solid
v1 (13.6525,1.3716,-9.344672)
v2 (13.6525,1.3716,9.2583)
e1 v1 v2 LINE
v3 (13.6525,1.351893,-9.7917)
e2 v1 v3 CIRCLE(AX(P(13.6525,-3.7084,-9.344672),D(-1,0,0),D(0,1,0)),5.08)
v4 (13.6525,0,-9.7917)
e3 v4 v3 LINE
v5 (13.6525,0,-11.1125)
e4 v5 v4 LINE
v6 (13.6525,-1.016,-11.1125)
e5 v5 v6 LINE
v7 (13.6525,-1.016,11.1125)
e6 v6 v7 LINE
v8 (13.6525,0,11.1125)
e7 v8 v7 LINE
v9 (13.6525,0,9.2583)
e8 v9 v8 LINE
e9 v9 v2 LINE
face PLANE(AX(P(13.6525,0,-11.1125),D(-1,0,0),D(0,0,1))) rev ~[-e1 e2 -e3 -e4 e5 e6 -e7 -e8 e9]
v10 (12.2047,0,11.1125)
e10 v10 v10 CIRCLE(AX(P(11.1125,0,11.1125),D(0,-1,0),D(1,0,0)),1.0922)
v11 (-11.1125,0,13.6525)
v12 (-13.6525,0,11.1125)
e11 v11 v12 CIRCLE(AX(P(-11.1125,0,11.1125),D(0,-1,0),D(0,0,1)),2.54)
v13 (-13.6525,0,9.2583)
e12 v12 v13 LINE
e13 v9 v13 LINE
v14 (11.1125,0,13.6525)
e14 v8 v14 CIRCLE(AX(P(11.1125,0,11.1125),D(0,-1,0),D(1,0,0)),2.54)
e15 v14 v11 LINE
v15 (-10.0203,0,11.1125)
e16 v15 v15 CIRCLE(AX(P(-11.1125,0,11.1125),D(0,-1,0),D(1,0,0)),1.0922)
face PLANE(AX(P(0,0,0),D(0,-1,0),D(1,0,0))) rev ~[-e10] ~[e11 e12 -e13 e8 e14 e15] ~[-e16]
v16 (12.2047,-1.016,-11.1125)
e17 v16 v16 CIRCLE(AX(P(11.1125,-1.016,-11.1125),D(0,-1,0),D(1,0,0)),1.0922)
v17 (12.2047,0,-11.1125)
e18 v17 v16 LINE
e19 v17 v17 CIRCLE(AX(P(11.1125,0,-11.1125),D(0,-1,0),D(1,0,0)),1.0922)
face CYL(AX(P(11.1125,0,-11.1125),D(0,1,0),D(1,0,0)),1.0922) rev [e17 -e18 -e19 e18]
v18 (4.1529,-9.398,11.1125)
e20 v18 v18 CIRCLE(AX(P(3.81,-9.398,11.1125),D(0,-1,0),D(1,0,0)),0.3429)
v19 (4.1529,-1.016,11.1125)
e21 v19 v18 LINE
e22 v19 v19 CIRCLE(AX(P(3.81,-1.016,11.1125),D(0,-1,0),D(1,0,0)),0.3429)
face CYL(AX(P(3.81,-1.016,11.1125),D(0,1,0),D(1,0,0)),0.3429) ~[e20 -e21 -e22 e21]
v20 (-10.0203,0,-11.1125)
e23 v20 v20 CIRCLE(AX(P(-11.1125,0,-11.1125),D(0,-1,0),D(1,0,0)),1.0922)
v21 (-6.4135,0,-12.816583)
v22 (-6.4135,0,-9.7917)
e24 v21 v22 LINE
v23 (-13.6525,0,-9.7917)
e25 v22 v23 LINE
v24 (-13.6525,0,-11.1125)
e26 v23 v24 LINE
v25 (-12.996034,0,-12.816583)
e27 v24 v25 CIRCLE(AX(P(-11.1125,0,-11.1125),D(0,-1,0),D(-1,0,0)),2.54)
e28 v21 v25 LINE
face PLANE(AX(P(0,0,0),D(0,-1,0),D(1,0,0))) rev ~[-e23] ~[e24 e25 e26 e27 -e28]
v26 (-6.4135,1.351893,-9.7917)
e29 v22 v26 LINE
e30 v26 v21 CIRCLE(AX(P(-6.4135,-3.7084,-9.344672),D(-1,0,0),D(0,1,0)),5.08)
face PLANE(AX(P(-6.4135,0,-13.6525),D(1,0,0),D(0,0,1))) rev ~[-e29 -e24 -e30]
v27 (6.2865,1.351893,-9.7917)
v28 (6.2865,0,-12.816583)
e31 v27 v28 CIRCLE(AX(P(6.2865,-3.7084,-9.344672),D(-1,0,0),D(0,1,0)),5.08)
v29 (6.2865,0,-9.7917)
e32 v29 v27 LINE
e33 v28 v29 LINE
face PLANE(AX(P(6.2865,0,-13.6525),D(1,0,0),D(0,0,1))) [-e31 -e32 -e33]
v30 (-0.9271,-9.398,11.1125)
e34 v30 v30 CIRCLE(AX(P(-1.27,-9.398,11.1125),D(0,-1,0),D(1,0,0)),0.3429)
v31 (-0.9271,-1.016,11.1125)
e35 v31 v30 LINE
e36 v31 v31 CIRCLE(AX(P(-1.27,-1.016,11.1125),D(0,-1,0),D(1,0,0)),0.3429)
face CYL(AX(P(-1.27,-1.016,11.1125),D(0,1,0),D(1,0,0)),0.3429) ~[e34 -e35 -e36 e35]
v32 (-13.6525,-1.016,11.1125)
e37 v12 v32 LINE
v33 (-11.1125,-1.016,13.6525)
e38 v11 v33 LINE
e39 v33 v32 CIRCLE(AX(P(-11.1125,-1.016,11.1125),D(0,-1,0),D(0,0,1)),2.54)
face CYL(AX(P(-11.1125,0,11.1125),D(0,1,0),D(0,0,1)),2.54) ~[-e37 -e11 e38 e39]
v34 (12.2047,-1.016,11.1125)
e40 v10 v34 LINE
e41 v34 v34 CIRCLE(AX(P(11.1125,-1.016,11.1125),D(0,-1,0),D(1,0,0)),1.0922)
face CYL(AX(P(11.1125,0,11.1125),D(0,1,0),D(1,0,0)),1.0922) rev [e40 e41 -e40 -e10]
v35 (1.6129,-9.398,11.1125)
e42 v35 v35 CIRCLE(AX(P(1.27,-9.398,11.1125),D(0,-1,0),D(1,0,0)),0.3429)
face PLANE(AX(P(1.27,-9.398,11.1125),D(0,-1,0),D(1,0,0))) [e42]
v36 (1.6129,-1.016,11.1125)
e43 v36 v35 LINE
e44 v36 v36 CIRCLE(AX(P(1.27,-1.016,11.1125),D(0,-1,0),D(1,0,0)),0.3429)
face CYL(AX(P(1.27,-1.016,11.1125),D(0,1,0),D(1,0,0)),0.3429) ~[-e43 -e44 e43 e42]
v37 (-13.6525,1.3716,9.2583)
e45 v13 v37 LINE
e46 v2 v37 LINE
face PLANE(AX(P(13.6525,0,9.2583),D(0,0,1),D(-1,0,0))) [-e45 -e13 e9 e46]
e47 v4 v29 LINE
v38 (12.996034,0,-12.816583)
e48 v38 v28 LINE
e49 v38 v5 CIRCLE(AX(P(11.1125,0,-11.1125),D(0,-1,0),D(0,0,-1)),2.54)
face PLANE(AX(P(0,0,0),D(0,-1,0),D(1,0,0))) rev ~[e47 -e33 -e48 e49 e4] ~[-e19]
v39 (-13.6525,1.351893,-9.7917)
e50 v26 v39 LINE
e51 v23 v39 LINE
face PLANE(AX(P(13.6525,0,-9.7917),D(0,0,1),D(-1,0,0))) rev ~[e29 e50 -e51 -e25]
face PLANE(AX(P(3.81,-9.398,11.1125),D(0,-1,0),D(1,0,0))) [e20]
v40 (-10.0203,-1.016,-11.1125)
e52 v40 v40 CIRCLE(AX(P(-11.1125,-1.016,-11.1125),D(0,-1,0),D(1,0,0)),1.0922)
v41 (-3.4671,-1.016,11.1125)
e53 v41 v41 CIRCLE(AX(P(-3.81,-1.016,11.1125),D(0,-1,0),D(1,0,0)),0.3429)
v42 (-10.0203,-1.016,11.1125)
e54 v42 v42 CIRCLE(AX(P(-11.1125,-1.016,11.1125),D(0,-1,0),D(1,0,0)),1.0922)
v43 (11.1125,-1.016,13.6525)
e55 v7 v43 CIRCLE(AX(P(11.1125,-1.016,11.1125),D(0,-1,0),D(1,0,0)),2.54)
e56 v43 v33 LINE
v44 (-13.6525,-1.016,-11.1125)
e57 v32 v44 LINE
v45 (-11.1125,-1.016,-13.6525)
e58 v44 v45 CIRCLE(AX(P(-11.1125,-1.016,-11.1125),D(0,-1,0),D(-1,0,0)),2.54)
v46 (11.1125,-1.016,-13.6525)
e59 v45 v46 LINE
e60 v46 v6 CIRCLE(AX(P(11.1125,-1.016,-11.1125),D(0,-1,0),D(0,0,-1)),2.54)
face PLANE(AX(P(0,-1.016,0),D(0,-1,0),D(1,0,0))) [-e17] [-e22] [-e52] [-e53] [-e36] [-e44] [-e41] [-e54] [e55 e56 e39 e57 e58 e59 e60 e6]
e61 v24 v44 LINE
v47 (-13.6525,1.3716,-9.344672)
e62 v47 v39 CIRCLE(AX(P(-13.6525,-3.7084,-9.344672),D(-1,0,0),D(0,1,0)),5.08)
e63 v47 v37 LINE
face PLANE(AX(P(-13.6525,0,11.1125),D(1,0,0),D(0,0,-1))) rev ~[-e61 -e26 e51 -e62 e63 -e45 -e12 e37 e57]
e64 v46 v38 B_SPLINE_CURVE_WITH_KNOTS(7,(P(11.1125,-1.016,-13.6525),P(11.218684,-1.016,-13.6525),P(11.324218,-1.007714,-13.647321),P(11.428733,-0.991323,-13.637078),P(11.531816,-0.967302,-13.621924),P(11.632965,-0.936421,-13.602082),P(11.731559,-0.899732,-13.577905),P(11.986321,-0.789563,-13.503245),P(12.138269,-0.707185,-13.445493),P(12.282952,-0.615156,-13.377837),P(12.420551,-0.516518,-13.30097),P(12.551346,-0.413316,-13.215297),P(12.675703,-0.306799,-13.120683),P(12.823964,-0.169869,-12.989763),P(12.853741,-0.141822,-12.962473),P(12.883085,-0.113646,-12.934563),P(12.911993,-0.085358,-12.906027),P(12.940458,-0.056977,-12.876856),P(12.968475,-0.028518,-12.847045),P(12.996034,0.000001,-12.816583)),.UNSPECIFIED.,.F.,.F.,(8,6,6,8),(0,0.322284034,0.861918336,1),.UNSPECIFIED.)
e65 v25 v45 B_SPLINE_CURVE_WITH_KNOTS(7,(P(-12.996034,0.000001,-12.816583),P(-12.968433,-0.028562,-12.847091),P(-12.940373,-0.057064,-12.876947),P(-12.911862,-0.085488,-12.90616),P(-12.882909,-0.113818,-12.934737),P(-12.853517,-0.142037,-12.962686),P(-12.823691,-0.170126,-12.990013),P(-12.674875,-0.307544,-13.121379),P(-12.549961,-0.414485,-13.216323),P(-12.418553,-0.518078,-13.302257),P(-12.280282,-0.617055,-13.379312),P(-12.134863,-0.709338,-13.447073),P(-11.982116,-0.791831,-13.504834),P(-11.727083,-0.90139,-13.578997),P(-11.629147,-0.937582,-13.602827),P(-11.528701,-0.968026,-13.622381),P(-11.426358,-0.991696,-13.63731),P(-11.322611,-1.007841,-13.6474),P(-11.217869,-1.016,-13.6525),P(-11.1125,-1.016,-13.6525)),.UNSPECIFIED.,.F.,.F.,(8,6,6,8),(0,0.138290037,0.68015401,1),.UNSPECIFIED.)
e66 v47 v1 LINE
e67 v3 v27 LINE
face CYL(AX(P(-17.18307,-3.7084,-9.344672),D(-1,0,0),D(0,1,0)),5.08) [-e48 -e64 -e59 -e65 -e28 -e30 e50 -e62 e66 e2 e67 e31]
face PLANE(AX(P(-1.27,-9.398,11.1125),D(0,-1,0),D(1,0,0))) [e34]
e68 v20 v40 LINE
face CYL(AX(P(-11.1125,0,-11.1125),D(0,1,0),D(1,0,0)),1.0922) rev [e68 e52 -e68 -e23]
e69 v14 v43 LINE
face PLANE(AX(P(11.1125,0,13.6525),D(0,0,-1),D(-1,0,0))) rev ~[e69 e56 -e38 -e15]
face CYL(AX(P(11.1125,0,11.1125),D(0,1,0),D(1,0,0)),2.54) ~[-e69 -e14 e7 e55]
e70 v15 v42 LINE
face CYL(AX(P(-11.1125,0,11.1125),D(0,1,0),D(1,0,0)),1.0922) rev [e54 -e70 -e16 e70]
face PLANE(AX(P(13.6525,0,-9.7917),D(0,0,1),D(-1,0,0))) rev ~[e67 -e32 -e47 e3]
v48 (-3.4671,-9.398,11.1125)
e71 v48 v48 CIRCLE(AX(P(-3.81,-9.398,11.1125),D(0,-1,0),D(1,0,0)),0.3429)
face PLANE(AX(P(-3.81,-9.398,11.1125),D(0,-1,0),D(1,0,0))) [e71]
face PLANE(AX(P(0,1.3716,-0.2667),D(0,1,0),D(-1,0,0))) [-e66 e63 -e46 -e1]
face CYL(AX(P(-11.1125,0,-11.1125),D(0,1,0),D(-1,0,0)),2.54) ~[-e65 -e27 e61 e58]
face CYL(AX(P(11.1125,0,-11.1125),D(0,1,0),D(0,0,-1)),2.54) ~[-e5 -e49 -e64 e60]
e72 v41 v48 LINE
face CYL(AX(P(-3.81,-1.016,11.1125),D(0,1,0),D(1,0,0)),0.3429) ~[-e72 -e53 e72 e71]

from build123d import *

# Parameters (mm, degrees)
F0_R        = 1.0922
F1_DEPTH    = 1.016
F2_R        = 0.3429
F3_DEPTH    = 8.382
F4_W        = 27.305
F4_H        = 19.05
F5_DEPTH    = 1.3716
F6_W        = 12.7
F6_H        = 3.8608
F7_DEPTH    = 1.3716
F8_T1_DEPTH = 34.2391400943


# Not quite as in the source:
# - a fillet or chamfer that OpenCascade refuses, or shapes differently, is made with other operations: its cross-section is extruded or revolved along the edge and cut away or added


with BuildPart() as f1:
    # F0 (on Front) → F1 (new body)
    with BuildSketch(Plane.XZ):
        with BuildLine():
            Line((11.1125, 13.6525), (-11.1125, 13.6525))
            ThreePointArc((-11.1125, 13.6525), (-12.9085512242, 12.9085512242), (-13.6525, 11.1125))
            Line((-13.6525, 11.1125), (-13.6525, -11.1125))
            ThreePointArc((-13.6525, -11.1125), (-12.9085512242, -12.9085512242), (-11.1125, -13.6525))
            Line((-11.1125, -13.6525), (11.1125, -13.6525))
            ThreePointArc((11.1125, -13.6525), (12.9085512242, -12.9085512242), (13.6525, -11.1125))
            Line((13.6525, -11.1125), (13.6525, 11.1125))
            ThreePointArc((13.6525, 11.1125), (12.9085512242, 12.9085512242), (11.1125, 13.6525))
        make_face()
        with Locations((-11.1125, -11.1125)):
            Circle(F0_R, mode=Mode.SUBTRACT)
        with Locations((11.1125, -11.1125)):
            Circle(F0_R, mode=Mode.SUBTRACT)
        with Locations((-11.1125, 11.1125)):
            Circle(F0_R, mode=Mode.SUBTRACT)
        with Locations((11.1125, 11.1125)):
            Circle(F0_R, mode=Mode.SUBTRACT)
    extrude(amount=F1_DEPTH)

    # F2 (on face) → F3 (join)
    with BuildSketch(Plane.XZ.offset(1.016)):
        with Locations((-3.81, 11.1125)):
            Circle(F2_R)
        with Locations((-1.27, 11.1125)):
            Circle(F2_R)
        with Locations((3.81, 11.1125)):
            Circle(F2_R)
        with Locations((1.27, 11.1125)):
            Circle(F2_R)
    extrude(amount=F3_DEPTH)

    # F4 (on face) → F5 (join)
    with BuildSketch(Plane(origin=(0, 0, 0), x_dir=(-1, 0, 0), z_dir=(0, 1, 0))):
        with Locations((0, -0.2667)):
            Rectangle(F4_W, F4_H)
    extrude(amount=F5_DEPTH)

    # F6 (on face) → F7 (join, through all)
    with BuildSketch(Plane(origin=(0, 0, 0), x_dir=(-1, 0, 0), z_dir=(0, 1, 0))):
        with Locations((0.0635, -11.7221)):
            Rectangle(F6_W, F6_H)
    extrude(amount=F7_DEPTH)

    # F8: fillet of radius 5.08 on 1 edges, made by hand

    # F8_s2 → F8_t1 (cut)
    with BuildSketch(Plane.YZ.offset(-17.1830700471)):
        with BuildLine():
            ThreePointArc((1.3716, -9.3446719811), (0.7347853439, -11.8072933487), (-1.016, -13.6525))
            Line((-1.016, -13.6525), (1.3716, -13.6525))
            Line((1.3716, -13.6525), (1.3716, -9.3446719811))
        make_face()
    extrude(amount=F8_T1_DEPTH, mode=Mode.SUBTRACT)


solid = f1.part
